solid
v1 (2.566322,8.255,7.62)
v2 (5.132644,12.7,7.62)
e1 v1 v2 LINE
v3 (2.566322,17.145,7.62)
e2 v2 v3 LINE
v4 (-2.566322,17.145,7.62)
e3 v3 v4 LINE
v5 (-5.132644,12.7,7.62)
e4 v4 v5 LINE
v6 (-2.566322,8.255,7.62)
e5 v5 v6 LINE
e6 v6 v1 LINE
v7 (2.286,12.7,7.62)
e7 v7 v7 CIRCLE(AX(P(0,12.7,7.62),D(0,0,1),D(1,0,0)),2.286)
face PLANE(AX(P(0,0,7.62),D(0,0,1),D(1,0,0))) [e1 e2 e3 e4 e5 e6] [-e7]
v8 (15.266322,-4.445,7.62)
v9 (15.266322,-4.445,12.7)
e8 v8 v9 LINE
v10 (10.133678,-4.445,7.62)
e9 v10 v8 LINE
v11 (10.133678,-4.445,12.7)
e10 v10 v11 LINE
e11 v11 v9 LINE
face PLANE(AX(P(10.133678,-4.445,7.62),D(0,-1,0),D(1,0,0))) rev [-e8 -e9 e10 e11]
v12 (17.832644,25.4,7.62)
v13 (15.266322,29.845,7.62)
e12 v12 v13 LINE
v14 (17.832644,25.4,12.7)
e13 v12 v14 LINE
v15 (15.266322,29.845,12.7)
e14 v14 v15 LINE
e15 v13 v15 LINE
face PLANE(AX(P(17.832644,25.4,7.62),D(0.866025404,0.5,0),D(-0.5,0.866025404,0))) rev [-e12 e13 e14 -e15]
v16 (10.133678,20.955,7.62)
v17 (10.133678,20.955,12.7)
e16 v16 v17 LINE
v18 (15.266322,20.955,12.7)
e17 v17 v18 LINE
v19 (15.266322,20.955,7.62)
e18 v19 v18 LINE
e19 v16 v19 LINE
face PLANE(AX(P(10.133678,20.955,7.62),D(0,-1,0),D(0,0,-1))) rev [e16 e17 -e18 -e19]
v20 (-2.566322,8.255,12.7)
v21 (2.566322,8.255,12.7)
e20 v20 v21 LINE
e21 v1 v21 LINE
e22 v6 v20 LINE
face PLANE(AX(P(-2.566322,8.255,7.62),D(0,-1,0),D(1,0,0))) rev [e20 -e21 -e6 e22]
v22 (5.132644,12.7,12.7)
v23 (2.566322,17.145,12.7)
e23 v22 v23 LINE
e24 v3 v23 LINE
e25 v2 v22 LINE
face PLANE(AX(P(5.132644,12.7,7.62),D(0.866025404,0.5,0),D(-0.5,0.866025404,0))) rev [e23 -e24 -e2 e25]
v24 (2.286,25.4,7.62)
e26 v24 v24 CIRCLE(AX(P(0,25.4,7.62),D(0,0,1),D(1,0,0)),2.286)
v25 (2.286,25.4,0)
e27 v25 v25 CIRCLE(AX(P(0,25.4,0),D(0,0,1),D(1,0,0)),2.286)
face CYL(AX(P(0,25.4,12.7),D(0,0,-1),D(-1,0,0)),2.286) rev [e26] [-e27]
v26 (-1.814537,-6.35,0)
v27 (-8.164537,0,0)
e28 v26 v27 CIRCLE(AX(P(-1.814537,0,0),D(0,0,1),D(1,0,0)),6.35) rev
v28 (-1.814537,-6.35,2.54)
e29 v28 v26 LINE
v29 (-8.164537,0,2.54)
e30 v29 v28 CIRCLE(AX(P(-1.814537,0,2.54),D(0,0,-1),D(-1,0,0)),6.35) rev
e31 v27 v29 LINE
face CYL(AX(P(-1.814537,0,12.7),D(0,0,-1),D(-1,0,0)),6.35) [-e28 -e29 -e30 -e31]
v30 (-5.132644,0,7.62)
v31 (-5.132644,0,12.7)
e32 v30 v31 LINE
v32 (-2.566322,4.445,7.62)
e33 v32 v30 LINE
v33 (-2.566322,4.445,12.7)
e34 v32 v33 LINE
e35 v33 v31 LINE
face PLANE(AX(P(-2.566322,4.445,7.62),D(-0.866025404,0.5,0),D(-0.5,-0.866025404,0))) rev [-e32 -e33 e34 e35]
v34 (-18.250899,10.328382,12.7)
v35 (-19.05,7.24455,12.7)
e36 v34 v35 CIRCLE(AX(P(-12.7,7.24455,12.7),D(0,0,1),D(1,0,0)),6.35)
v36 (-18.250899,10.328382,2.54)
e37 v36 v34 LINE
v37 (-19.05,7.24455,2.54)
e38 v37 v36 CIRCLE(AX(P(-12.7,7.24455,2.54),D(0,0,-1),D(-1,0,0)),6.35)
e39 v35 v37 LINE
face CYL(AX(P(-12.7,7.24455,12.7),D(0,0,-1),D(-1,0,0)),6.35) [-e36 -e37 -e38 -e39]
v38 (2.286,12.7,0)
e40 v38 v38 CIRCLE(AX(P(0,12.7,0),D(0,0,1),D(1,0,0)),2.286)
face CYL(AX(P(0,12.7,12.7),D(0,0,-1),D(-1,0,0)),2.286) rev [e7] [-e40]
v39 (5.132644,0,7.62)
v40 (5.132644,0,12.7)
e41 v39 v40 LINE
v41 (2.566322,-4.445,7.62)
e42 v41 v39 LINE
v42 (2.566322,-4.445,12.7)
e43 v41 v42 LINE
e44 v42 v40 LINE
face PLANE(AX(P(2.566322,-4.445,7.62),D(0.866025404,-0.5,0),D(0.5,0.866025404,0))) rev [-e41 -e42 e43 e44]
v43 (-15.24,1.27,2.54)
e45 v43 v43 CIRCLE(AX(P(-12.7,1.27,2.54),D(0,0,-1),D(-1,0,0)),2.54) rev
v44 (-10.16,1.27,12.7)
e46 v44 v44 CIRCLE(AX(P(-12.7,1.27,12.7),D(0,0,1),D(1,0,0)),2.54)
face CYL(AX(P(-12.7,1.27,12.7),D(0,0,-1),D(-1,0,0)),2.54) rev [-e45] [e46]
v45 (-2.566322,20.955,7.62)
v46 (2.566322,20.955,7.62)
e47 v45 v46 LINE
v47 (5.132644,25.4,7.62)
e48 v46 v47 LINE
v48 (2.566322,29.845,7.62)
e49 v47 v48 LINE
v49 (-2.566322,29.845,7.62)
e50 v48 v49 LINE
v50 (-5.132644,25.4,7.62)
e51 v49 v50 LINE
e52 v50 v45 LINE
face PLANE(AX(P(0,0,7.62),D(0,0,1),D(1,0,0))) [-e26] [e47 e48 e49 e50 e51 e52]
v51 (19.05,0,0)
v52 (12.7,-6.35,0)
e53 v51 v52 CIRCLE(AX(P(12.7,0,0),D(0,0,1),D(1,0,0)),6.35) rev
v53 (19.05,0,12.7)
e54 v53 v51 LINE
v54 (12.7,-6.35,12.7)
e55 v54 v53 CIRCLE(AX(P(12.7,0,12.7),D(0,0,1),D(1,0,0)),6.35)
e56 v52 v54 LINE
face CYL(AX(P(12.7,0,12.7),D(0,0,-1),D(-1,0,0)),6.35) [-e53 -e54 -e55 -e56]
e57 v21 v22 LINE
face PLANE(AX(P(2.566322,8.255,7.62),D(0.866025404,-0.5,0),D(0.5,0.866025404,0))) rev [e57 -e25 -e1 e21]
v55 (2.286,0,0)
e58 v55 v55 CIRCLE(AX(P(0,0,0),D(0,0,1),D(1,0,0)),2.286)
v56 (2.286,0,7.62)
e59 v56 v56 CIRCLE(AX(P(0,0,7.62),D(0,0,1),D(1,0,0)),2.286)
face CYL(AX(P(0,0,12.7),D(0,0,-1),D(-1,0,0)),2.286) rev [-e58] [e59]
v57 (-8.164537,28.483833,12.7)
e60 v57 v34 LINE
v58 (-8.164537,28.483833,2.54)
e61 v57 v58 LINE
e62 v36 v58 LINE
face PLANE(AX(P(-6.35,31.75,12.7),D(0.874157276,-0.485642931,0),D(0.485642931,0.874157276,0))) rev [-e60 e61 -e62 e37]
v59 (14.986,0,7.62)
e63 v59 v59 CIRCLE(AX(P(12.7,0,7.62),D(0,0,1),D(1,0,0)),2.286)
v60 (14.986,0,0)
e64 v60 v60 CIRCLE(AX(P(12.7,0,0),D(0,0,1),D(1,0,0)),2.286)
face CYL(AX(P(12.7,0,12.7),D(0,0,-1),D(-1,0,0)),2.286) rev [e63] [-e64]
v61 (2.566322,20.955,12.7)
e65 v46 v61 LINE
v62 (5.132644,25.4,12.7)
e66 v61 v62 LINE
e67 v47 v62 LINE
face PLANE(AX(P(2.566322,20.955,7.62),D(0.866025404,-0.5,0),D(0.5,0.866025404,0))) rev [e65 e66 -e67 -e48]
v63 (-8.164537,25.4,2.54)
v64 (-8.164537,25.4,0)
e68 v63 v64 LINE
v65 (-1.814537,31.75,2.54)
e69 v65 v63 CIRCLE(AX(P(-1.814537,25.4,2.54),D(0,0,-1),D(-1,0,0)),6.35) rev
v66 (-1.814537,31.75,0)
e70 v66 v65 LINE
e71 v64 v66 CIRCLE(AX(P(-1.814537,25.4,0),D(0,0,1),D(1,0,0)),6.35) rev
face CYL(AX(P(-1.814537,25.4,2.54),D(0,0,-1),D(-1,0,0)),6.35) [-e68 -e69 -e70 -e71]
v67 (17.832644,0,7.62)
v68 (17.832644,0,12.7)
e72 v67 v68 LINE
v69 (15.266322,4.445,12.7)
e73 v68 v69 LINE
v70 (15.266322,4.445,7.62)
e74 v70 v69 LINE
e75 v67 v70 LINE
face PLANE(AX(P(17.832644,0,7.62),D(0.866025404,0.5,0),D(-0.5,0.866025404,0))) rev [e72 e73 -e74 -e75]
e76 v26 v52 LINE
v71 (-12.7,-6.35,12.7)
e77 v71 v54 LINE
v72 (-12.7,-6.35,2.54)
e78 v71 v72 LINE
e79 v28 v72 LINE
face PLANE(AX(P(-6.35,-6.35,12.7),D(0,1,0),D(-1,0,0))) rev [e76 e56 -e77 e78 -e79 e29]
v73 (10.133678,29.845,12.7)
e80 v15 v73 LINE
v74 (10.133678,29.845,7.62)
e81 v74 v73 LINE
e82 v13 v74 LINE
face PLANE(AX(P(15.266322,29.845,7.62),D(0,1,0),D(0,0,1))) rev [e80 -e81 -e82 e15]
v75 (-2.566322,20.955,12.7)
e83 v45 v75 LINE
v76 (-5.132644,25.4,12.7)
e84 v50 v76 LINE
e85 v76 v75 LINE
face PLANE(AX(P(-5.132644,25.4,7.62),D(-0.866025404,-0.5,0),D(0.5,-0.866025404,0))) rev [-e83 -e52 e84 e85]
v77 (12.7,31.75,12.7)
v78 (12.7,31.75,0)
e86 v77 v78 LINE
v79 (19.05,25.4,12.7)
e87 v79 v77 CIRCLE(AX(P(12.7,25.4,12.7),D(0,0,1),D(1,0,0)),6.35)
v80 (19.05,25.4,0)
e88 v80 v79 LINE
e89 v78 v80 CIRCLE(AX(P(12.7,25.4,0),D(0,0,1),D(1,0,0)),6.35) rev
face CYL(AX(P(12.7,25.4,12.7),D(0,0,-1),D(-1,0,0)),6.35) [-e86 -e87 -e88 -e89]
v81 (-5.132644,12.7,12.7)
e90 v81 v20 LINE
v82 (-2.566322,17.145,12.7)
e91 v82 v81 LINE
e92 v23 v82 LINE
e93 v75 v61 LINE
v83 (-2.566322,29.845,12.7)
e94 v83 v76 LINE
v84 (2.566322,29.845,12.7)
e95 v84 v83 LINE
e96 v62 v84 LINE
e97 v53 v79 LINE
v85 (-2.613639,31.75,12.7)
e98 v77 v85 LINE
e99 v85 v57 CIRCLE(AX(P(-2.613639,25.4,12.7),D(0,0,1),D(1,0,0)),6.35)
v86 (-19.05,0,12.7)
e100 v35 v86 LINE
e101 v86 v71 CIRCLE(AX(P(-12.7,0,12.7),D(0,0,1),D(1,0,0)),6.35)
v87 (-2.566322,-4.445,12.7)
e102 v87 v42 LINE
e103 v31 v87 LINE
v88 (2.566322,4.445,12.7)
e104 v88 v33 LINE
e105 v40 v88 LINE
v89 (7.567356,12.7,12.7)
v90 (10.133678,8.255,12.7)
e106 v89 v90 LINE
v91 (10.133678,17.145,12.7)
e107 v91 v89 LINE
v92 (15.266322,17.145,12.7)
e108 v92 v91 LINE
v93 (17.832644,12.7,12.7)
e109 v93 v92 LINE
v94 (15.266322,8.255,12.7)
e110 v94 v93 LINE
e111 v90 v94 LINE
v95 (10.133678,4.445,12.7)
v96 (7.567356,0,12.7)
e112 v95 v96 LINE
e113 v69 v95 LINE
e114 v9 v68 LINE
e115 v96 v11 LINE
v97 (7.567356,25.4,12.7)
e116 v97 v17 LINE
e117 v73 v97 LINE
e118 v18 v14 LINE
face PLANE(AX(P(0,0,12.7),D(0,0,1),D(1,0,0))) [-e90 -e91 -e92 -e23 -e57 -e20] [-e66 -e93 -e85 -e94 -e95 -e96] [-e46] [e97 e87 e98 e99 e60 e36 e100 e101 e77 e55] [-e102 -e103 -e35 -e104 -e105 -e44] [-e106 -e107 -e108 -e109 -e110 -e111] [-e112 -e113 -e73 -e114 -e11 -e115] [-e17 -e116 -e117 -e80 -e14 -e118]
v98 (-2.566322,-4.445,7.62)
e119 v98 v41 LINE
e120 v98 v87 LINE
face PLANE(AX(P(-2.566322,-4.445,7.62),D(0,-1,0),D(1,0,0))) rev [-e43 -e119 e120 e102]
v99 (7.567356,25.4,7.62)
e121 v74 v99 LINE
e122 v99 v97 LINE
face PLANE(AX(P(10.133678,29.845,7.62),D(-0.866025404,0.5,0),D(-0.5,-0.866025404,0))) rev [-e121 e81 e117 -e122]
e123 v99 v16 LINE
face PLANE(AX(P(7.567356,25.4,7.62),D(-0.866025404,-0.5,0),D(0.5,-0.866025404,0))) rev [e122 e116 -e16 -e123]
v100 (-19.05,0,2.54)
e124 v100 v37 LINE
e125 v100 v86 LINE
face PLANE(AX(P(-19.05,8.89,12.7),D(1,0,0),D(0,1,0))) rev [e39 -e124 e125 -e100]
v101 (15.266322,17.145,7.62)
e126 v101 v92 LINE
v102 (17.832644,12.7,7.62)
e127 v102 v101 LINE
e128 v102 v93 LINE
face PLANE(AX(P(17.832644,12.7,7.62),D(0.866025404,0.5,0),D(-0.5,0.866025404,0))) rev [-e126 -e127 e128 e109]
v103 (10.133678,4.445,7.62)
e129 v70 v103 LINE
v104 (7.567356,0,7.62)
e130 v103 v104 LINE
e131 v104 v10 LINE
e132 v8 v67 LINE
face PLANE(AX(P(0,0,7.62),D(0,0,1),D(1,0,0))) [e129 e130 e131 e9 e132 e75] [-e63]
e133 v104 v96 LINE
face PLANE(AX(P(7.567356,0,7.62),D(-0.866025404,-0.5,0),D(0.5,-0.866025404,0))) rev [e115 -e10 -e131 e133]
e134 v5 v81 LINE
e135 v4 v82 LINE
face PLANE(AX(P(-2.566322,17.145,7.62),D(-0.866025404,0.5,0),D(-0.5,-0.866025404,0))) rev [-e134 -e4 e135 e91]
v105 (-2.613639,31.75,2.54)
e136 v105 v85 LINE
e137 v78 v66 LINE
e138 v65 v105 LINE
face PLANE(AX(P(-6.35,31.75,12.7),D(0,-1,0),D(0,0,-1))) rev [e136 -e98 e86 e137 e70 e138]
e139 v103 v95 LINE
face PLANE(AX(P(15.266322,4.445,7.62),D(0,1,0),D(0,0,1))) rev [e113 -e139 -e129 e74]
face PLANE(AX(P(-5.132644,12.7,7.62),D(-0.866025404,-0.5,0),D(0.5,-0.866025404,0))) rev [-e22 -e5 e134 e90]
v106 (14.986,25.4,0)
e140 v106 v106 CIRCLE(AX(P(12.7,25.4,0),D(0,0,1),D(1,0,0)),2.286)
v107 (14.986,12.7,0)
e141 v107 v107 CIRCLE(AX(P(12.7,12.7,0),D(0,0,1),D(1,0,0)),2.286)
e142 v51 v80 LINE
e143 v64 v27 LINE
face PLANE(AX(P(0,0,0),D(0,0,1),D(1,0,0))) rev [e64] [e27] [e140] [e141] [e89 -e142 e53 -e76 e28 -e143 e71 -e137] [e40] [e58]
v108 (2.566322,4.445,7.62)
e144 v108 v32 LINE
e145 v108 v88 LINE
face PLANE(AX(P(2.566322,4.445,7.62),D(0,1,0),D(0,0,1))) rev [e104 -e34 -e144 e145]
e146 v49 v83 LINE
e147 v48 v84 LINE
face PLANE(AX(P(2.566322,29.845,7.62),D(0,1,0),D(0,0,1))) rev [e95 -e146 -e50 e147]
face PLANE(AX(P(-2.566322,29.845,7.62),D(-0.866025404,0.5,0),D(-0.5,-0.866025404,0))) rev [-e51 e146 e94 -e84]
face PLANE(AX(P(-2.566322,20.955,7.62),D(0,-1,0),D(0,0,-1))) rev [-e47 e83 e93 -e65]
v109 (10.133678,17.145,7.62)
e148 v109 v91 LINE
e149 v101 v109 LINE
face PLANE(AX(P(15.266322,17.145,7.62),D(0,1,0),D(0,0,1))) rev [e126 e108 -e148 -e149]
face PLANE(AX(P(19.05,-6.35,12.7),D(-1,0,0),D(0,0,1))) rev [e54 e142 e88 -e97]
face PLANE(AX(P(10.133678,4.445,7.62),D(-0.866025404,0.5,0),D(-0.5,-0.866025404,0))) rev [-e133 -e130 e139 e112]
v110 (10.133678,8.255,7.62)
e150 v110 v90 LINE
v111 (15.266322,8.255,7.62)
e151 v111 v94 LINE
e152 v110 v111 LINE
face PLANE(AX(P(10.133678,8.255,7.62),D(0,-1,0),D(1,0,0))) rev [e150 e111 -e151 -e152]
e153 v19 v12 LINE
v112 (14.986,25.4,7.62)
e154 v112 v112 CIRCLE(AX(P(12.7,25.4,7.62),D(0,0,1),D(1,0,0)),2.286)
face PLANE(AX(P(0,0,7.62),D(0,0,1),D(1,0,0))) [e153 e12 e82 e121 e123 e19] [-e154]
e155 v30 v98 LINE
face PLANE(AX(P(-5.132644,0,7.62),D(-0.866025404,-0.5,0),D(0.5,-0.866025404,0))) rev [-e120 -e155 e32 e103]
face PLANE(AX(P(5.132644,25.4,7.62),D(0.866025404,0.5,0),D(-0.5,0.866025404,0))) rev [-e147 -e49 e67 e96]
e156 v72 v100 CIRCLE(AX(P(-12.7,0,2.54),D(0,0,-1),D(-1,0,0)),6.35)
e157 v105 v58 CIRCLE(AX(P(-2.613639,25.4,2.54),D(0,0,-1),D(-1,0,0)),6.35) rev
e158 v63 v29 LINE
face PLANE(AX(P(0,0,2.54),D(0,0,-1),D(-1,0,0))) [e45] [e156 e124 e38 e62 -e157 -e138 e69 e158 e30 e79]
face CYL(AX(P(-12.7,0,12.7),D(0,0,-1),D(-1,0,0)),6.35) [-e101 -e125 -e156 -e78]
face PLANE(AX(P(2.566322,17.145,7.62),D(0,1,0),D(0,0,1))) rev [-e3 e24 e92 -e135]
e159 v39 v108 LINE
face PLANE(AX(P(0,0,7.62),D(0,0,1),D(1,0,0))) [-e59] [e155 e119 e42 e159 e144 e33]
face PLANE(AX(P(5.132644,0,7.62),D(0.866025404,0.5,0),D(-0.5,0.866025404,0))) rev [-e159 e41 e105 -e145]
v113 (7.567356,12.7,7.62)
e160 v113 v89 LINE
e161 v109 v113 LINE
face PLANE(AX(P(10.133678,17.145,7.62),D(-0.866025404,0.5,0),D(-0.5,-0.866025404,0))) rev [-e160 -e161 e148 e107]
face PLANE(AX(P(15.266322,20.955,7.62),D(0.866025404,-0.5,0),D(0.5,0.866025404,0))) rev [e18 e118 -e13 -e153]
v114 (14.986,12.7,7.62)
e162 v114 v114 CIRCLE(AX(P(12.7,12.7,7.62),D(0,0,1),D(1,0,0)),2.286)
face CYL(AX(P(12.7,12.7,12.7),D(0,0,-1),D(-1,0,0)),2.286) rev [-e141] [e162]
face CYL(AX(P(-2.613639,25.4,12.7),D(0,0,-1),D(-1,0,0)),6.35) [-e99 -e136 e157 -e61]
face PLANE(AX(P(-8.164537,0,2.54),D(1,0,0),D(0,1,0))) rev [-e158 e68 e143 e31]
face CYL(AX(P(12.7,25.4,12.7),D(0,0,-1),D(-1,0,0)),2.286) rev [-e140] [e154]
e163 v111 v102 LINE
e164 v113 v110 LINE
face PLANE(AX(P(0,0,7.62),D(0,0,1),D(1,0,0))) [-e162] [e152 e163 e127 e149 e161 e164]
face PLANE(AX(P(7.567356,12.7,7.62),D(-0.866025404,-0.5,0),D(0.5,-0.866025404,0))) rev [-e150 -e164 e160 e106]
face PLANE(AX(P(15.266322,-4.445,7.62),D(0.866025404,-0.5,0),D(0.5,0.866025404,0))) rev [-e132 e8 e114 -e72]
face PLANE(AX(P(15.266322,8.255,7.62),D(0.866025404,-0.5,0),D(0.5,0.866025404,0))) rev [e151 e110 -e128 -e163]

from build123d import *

# Parameters (mm, degrees)
SKETCH1_R           = 2.286
SKETCH1_R_2         = 2.54
BOSS_EXTRUDE1_DEPTH = 12.7
FILLET1_R           = 6.35
CUT_EXTRUDE1_DEPTH  = 5.08
CUT_EXTRUDE2_START  = -2.54
SKETCH3_R           = 2.54
CUT_EXTRUDE2_DEPTH  = 2.54
FILLET2_R           = 6.35


with BuildPart() as part:
    # Sketch1 → Boss-Extrude1 (new body)
    with BuildSketch(Plane.XY):
        Polygon((-6.35, 31.75), (-19.05, 8.89), (-19.05, -6.35), (-6.35, -6.35), (19.05, -6.35), (19.05, 31.75), align=None)
        Circle(SKETCH1_R, mode=Mode.SUBTRACT)
        with Locations((-12.7, 1.27)):
            Circle(SKETCH1_R_2, mode=Mode.SUBTRACT)
        with Locations((12.7, 0)):
            Circle(SKETCH1_R, mode=Mode.SUBTRACT)
        with Locations((12.7, 12.7)):
            Circle(SKETCH1_R, mode=Mode.SUBTRACT)
        with Locations((12.7, 25.4)):
            Circle(SKETCH1_R, mode=Mode.SUBTRACT)
        with Locations((0, 12.7)):
            Circle(SKETCH1_R, mode=Mode.SUBTRACT)
        with Locations((0, 25.4)):
            Circle(SKETCH1_R, mode=Mode.SUBTRACT)
    extrude(amount=BOSS_EXTRUDE1_DEPTH)

    # Fillet1
    fillet1_edges = [part.edges().sort_by_distance(p)[0] for p in [
        (-19.05, -6.35, 6.35),
        (-19.05, 8.89, 6.35),
        (-6.35, 31.75, 6.35),
        (19.05, 31.75, 6.35),
        (19.05, -6.35, 6.35),
    ]]
    fillet(fillet1_edges, radius=FILLET1_R)

    # Sketch2 → Cut-Extrude1 (cut)
    with BuildSketch(Plane.XY.offset(12.7)):
        Polygon((17.832643893, 0), (15.266321947, 4.445), (10.133678053, 4.445), (7.567356107, 0), (10.133678053, -4.445), (15.266321947, -4.445), align=None)
        Polygon((5.132643893, 0), (2.566321947, 4.445), (-2.566321947, 4.445), (-5.132643893, 0), (-2.566321947, -4.445), (2.566321947, -4.445), align=None)
        Polygon((17.832643893, 12.7), (15.266321947, 17.145), (10.133678053, 17.145), (7.567356107, 12.7), (10.133678053, 8.255), (15.266321947, 8.255), align=None)
        Polygon((17.832643893, 25.4), (15.266321947, 29.845), (10.133678053, 29.845), (7.567356107, 25.4), (10.133678053, 20.955), (15.266321947, 20.955), align=None)
        Polygon((5.132643893, 12.7), (2.566321947, 17.145), (-2.566321947, 17.145), (-5.132643893, 12.7), (-2.566321947, 8.255), (2.566321947, 8.255), align=None)
        Polygon((5.132643893, 25.4), (2.566321947, 29.845), (-2.566321947, 29.845), (-5.132643893, 25.4), (-2.566321947, 20.955), (2.566321947, 20.955), align=None)
    extrude(amount=-CUT_EXTRUDE1_DEPTH, mode=Mode.SUBTRACT)

    # Sketch3 → Cut-Extrude2 (cut)
    with BuildSketch(Plane(origin=(0, 0, 0), x_dir=(-1, 0, 0), z_dir=(0, 0, -1)).offset(CUT_EXTRUDE2_START)):
        with BuildLine():
            Line((18.250898703, 10.328382334), (8.164537437, 28.483832613))
            Line((8.164537437, 28.483832613), (8.164537437, -6.35))
            Line((8.164537437, -6.35), (12.7, -6.35))
            ThreePointArc((12.7, -6.35), (17.190128061, -4.490128061), (19.05, 0))
            Line((19.05, 0), (19.05, 7.244549721))
            ThreePointArc((19.05, 7.244549721), (18.846979208, 8.837392029), (18.250898703, 10.328382334))
        make_face()
        with Locations((12.7, 1.27)):
            Circle(SKETCH3_R, mode=Mode.SUBTRACT)
    extrude(amount=CUT_EXTRUDE2_DEPTH, mode=Mode.SUBTRACT)

    # Fillet2
    # the kernel refuses this fillet: 6.35 mm, written as the material it takes off along each edge
    with BuildSketch(Plane(origin=(-8.164537437, -6.35, 2.54), x_dir=(1, 0, 0), z_dir=(0, 0, -1))) as fillet2_piece_1:
        with BuildLine():
            CenterArc((FILLET2_R, -FILLET2_R), FILLET2_R, 90, 90)
            Line((0, -FILLET2_R), (0, 0))
            Line((0, 0), (FILLET2_R, 0))
        make_face()
    extrude(amount=18.415, mode=Mode.SUBTRACT)
    with BuildSketch(Plane(origin=(-8.164537437, 28.483832613, -17.851881799), x_dir=(0.8892619937285123, 0.45739819250844366, 0), z_dir=(0, 0, 1))) as fillet2_piece_2:
        with BuildLine():
            CenterArc((4.236274197, -5.64681366), FILLET2_R, 62.780655364, 90)
            Line((-1.410539463, -2.742335138), (-1.975220829, -2.451887286))
            Line((-1.975220829, -2.451887286), (-0.564681366, 0.290447852))
            Line((-0.564681366, 0.290447852), (-0.352566378, 0.528130617))
            ThreePointArc((-0.352566378, 0.528130617), (6.720590159, 0.930188855), (7.431200572, 0.564681366))
            Line((7.431200572, 0.564681366), (7.140752719, 0))
        make_face()
    extrude(amount=20.391881799, mode=Mode.SUBTRACT)


solid = part.part
